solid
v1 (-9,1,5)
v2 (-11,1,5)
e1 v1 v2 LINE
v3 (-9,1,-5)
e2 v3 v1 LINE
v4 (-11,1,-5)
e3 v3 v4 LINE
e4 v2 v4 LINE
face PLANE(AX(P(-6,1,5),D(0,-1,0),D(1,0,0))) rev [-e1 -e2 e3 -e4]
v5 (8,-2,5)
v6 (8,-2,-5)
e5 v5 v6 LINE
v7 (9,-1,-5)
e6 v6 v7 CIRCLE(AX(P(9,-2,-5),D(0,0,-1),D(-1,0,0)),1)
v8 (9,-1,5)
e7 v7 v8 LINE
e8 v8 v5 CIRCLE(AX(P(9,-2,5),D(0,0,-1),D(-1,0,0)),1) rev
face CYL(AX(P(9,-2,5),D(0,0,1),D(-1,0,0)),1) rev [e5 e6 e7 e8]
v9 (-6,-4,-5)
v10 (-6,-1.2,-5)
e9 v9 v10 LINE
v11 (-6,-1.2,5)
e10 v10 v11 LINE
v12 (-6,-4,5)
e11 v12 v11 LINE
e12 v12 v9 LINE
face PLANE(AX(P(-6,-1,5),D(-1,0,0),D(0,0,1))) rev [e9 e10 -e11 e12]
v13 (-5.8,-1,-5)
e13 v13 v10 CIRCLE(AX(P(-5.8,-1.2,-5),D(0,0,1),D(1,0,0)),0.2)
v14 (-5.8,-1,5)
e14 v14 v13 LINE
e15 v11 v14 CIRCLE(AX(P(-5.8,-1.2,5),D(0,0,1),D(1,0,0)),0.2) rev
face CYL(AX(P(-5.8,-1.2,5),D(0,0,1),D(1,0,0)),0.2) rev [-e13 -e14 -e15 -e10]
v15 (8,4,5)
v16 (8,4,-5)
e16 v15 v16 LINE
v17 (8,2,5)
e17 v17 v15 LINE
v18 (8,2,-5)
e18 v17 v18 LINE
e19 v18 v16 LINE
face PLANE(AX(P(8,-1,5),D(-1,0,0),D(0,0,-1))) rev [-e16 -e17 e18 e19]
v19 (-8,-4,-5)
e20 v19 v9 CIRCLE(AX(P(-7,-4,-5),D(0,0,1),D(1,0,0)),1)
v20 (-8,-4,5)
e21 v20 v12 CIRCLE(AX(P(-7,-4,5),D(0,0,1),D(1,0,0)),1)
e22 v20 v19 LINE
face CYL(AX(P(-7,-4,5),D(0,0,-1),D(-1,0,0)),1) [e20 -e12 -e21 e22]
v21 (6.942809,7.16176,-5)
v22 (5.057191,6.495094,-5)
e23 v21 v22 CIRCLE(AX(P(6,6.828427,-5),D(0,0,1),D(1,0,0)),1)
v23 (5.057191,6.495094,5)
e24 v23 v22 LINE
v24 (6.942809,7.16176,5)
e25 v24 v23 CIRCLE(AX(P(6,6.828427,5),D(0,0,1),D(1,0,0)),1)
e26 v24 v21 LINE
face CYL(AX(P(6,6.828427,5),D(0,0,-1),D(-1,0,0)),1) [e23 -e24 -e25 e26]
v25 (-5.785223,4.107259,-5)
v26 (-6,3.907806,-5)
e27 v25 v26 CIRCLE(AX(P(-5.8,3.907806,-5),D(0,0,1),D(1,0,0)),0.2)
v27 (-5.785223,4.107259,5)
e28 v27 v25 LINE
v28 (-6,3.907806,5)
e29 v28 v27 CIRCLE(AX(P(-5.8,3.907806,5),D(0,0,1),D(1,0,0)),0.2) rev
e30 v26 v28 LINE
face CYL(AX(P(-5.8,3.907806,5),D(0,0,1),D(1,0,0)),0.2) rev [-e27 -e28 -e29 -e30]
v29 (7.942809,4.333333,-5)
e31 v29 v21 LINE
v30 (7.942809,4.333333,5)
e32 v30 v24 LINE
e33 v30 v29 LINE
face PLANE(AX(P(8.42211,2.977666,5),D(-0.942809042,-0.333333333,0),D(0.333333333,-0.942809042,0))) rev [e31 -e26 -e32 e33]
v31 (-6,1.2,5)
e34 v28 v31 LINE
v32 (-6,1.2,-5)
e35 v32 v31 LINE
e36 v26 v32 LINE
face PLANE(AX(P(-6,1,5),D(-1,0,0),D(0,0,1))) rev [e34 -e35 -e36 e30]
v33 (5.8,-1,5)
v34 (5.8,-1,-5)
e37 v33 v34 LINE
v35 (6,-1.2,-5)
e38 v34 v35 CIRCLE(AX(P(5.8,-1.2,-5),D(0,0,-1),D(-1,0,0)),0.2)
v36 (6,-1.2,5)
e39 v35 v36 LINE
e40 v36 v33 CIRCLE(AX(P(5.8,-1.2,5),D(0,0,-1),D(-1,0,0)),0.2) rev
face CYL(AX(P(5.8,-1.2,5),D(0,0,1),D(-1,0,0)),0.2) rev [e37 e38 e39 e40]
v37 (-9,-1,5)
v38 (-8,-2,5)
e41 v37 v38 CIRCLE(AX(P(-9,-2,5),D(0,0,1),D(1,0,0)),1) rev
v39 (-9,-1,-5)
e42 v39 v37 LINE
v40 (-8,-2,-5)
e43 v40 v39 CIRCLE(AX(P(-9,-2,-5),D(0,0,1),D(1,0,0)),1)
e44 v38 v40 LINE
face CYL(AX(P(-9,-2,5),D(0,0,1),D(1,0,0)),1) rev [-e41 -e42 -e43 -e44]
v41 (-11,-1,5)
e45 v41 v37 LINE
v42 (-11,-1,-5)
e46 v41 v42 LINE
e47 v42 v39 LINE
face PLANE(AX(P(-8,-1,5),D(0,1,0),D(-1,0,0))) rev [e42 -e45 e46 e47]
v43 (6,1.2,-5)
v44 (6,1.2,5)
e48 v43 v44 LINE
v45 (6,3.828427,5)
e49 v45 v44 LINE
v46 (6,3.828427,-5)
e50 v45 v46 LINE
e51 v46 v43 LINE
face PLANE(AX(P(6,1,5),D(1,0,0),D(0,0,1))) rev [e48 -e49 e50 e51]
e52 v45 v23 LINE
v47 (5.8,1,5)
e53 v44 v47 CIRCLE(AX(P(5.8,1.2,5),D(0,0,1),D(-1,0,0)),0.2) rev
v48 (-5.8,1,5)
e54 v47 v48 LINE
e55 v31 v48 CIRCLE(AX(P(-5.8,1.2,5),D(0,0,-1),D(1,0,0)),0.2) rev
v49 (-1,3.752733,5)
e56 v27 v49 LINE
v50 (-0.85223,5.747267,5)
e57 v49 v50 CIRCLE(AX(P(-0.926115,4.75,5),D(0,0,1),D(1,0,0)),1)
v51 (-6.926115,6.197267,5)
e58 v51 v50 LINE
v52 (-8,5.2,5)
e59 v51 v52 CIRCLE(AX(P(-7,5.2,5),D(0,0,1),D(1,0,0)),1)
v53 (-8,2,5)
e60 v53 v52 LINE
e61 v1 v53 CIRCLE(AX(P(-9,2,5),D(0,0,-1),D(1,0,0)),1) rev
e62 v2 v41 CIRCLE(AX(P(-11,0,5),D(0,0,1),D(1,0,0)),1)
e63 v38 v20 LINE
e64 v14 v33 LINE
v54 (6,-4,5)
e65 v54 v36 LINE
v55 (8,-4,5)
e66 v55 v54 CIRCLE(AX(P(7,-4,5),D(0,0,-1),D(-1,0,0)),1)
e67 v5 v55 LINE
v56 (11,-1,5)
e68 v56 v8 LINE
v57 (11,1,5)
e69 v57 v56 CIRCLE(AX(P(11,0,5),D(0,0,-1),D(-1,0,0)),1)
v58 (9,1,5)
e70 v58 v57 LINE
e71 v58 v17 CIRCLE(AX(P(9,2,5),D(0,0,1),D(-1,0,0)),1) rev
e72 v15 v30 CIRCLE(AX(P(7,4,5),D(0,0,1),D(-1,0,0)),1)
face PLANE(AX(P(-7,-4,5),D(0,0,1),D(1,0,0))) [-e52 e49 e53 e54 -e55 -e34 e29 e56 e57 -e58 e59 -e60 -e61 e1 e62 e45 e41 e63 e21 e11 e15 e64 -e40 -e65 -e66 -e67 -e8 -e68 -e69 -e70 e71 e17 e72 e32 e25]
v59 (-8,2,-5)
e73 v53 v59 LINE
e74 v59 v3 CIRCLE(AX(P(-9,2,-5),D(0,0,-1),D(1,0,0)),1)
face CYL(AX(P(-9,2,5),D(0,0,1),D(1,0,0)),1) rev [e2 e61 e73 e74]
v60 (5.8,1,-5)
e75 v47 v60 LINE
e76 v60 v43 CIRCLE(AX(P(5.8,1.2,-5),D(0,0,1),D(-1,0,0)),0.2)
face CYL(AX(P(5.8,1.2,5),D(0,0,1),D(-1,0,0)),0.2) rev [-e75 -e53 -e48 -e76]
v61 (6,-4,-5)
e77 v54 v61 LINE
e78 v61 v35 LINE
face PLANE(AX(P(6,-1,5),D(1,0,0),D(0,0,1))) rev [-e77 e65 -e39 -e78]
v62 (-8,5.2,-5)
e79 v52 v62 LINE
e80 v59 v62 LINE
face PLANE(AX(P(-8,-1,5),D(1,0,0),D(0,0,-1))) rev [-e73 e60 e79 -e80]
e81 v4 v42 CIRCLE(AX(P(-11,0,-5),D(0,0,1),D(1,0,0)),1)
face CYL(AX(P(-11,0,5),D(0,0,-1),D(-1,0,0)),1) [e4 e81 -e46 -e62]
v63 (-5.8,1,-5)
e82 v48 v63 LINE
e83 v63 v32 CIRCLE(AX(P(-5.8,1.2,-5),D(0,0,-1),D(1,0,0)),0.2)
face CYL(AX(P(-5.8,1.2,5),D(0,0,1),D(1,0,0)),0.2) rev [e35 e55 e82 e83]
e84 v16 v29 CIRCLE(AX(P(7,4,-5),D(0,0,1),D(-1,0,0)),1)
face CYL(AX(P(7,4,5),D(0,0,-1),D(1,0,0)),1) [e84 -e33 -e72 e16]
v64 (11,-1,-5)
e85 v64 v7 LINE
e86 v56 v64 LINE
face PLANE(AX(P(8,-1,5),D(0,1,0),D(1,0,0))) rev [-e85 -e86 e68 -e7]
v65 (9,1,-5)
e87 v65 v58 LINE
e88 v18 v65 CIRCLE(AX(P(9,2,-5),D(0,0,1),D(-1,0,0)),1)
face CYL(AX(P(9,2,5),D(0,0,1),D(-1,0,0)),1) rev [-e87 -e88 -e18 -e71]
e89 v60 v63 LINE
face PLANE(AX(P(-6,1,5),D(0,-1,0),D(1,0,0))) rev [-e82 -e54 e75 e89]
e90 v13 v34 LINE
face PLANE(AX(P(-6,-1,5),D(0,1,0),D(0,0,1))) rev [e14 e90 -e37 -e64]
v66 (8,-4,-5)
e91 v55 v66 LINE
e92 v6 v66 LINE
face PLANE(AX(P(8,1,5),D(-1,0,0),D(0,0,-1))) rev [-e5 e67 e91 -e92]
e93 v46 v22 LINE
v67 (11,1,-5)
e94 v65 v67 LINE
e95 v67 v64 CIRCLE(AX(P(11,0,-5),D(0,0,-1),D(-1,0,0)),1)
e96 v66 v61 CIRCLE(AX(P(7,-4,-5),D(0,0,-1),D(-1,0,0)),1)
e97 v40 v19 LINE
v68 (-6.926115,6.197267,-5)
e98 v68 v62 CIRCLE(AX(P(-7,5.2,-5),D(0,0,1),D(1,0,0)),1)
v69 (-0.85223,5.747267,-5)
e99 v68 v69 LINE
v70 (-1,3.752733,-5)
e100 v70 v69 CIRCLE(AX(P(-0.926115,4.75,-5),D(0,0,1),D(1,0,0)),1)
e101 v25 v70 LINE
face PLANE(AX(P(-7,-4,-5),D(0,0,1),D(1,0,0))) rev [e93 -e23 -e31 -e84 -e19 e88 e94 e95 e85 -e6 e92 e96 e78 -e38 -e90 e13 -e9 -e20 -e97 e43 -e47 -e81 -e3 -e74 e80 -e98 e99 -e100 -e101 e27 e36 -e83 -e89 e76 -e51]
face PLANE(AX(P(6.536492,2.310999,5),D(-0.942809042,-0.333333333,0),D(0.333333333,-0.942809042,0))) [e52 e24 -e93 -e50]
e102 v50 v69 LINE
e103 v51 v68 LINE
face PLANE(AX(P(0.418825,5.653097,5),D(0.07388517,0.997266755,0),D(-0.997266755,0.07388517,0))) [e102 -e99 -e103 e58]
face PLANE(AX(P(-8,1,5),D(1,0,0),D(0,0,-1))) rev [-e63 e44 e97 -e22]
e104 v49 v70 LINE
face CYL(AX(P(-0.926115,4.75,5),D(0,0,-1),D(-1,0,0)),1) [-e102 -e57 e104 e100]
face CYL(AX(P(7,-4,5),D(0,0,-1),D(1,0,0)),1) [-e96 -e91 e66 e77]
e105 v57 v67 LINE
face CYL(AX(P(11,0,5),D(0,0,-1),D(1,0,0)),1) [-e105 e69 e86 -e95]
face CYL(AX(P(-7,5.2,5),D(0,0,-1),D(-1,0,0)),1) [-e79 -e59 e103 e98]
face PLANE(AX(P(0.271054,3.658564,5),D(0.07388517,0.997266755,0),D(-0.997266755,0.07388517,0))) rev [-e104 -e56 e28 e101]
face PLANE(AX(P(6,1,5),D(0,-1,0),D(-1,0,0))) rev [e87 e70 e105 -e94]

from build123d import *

# Parameters (mm, degrees)
BOSS_EXTRUDE1_DEPTH = 5
BOSS_EXTRUDE2_DEPTH = 5
FILLET2_R           = 1
FILLET3_R           = 0.2
MIRROR2_START       = -5
MIRROR2_DEPTH       = 10
BOSS_EXTRUDE3_DEPTH = 5
FILLET4_R           = 0.2


# Read off the part's stored shape, not the designer's step: Mirror2
with BuildPart() as part:
    # Sketch1 → Boss-Extrude1 (new, symmetric)
    with BuildSketch(Plane.XY):
        with BuildLine():
            Line((-6, -1), (0, -1))
            Line((0, -1), (0, 1))
            Line((0, 1), (-6, 1))
            Line((-6, 1), (-8, 1))
            Line((-8, 1), (-8, -4))
            ThreePointArc((-8, -4), (-7, -5), (-6, -4))
            Line((-6, -4), (-6, -1))
        make_face()
    extrude(amount=BOSS_EXTRUDE1_DEPTH, both=True)

    # Sketch2 → Boss-Extrude2 (add, symmetric)
    with BuildSketch(Plane.XY):
        with BuildLine():
            Line((-8, -1), (-11, -1))
            ThreePointArc((-11, -1), (-12, 0), (-11, 1))
            Line((-11, 1), (-8, 1))
            ThreePointArc((-8, 1), (-7, 0), (-8, -1))
        make_face()
    extrude(amount=BOSS_EXTRUDE2_DEPTH, both=True)

    # Fillet2
    fillet2_edges = [part.edges().sort_by_distance(p)[0] for p in [
        (-8, -1, 0),
    ]]
    fillet(fillet2_edges, radius=FILLET2_R)

    # Fillet3
    fillet3_edges = [part.edges().sort_by_distance(p)[0] for p in [
        (-6, -1, 0),
    ]]
    fillet(fillet3_edges, radius=FILLET3_R)

    # Mirror2 outline → Mirror2 (add)
    with BuildSketch(Plane.XY.offset(MIRROR2_START)):
        with BuildLine():
            Line((5.8, 1), (0, 1))
            Line((0, 1), (0, -1))
            Line((0, -1), (5.8, -1))
            ThreePointArc((5.8, -1), (5.941421356, -1.058578644), (6, -1.2))
            Line((6, -1.2), (6, -4))
            ThreePointArc((6, -4), (7, -5), (8, -4))
            Line((8, -4), (8, -2))
            ThreePointArc((8, -2), (8.292893219, -1.292893219), (9, -1))
            Line((9, -1), (11, -1))
            ThreePointArc((11, -1), (12, 0), (11, 1))
            Line((11, 1), (9, 1))
            ThreePointArc((9, 1), (8.292893219, 1.292893219), (8, 2))
            Line((8, 2), (8, 4))
            ThreePointArc((8, 4), (7, 5), (6, 4))
            Line((6, 4), (6, 1.2))
            ThreePointArc((6, 1.2), (5.941421356, 1.058578644), (5.8, 1))
        make_face()
        with BuildLine():
            Line((-9, 1), (-5.8, 1))
            ThreePointArc((-5.8, 1), (-5.941421356, 1.058578644), (-6, 1.2))
            Line((-6, 1.2), (-6, 4))
            ThreePointArc((-6, 4), (-7, 5), (-8, 4))
            Line((-8, 4), (-8, 2))
            ThreePointArc((-8, 2), (-8.292893219, 1.292893219), (-9, 1))
        make_face()
    extrude(amount=MIRROR2_DEPTH)

    # Sketch4 → Boss-Extrude3 (add, symmetric)
    with BuildSketch(Plane.XY):
        with BuildLine():
            Line((-6.92611483, 6.197266755), (-0.852229659, 5.747266755))
            ThreePointArc((-0.852229659, 5.747266755), (0.071151926, 4.67611483), (-1, 3.752733245))
            Line((-1, 3.752733245), (-7.07388517, 4.202733245))
            ThreePointArc((-7.07388517, 4.202733245), (-7.997266755, 5.27388517), (-6.92611483, 6.197266755))
        make_face()
        with BuildLine():
            Line((6.057190958, 3.666666667), (5.057190958, 6.495093791))
            ThreePointArc((5.057190958, 6.495093791), (5.666666667, 7.771236166), (6.942809042, 7.161760458))
            Line((6.942809042, 7.161760458), (7.942809042, 4.333333333))
            ThreePointArc((7.942809042, 4.333333333), (7.333333333, 3.057190958), (6.057190958, 3.666666667))
        make_face()
        with BuildLine():
            Line((-6, 5.2), (-6, 4))
            ThreePointArc((-6, 4), (-7, 3), (-8, 4))
            Line((-8, 4), (-8, 5.2))
            ThreePointArc((-8, 5.2), (-7, 6.2), (-6, 5.2))
        make_face()
    extrude(amount=BOSS_EXTRUDE3_DEPTH, both=True)

    # Fillet4
    fillet4_edges = [part.edges().sort_by_distance(p)[0] for p in [
        (-6, 4.123171594, 0),
    ]]
    fillet(fillet4_edges, radius=FILLET4_R)


solid = part.part
